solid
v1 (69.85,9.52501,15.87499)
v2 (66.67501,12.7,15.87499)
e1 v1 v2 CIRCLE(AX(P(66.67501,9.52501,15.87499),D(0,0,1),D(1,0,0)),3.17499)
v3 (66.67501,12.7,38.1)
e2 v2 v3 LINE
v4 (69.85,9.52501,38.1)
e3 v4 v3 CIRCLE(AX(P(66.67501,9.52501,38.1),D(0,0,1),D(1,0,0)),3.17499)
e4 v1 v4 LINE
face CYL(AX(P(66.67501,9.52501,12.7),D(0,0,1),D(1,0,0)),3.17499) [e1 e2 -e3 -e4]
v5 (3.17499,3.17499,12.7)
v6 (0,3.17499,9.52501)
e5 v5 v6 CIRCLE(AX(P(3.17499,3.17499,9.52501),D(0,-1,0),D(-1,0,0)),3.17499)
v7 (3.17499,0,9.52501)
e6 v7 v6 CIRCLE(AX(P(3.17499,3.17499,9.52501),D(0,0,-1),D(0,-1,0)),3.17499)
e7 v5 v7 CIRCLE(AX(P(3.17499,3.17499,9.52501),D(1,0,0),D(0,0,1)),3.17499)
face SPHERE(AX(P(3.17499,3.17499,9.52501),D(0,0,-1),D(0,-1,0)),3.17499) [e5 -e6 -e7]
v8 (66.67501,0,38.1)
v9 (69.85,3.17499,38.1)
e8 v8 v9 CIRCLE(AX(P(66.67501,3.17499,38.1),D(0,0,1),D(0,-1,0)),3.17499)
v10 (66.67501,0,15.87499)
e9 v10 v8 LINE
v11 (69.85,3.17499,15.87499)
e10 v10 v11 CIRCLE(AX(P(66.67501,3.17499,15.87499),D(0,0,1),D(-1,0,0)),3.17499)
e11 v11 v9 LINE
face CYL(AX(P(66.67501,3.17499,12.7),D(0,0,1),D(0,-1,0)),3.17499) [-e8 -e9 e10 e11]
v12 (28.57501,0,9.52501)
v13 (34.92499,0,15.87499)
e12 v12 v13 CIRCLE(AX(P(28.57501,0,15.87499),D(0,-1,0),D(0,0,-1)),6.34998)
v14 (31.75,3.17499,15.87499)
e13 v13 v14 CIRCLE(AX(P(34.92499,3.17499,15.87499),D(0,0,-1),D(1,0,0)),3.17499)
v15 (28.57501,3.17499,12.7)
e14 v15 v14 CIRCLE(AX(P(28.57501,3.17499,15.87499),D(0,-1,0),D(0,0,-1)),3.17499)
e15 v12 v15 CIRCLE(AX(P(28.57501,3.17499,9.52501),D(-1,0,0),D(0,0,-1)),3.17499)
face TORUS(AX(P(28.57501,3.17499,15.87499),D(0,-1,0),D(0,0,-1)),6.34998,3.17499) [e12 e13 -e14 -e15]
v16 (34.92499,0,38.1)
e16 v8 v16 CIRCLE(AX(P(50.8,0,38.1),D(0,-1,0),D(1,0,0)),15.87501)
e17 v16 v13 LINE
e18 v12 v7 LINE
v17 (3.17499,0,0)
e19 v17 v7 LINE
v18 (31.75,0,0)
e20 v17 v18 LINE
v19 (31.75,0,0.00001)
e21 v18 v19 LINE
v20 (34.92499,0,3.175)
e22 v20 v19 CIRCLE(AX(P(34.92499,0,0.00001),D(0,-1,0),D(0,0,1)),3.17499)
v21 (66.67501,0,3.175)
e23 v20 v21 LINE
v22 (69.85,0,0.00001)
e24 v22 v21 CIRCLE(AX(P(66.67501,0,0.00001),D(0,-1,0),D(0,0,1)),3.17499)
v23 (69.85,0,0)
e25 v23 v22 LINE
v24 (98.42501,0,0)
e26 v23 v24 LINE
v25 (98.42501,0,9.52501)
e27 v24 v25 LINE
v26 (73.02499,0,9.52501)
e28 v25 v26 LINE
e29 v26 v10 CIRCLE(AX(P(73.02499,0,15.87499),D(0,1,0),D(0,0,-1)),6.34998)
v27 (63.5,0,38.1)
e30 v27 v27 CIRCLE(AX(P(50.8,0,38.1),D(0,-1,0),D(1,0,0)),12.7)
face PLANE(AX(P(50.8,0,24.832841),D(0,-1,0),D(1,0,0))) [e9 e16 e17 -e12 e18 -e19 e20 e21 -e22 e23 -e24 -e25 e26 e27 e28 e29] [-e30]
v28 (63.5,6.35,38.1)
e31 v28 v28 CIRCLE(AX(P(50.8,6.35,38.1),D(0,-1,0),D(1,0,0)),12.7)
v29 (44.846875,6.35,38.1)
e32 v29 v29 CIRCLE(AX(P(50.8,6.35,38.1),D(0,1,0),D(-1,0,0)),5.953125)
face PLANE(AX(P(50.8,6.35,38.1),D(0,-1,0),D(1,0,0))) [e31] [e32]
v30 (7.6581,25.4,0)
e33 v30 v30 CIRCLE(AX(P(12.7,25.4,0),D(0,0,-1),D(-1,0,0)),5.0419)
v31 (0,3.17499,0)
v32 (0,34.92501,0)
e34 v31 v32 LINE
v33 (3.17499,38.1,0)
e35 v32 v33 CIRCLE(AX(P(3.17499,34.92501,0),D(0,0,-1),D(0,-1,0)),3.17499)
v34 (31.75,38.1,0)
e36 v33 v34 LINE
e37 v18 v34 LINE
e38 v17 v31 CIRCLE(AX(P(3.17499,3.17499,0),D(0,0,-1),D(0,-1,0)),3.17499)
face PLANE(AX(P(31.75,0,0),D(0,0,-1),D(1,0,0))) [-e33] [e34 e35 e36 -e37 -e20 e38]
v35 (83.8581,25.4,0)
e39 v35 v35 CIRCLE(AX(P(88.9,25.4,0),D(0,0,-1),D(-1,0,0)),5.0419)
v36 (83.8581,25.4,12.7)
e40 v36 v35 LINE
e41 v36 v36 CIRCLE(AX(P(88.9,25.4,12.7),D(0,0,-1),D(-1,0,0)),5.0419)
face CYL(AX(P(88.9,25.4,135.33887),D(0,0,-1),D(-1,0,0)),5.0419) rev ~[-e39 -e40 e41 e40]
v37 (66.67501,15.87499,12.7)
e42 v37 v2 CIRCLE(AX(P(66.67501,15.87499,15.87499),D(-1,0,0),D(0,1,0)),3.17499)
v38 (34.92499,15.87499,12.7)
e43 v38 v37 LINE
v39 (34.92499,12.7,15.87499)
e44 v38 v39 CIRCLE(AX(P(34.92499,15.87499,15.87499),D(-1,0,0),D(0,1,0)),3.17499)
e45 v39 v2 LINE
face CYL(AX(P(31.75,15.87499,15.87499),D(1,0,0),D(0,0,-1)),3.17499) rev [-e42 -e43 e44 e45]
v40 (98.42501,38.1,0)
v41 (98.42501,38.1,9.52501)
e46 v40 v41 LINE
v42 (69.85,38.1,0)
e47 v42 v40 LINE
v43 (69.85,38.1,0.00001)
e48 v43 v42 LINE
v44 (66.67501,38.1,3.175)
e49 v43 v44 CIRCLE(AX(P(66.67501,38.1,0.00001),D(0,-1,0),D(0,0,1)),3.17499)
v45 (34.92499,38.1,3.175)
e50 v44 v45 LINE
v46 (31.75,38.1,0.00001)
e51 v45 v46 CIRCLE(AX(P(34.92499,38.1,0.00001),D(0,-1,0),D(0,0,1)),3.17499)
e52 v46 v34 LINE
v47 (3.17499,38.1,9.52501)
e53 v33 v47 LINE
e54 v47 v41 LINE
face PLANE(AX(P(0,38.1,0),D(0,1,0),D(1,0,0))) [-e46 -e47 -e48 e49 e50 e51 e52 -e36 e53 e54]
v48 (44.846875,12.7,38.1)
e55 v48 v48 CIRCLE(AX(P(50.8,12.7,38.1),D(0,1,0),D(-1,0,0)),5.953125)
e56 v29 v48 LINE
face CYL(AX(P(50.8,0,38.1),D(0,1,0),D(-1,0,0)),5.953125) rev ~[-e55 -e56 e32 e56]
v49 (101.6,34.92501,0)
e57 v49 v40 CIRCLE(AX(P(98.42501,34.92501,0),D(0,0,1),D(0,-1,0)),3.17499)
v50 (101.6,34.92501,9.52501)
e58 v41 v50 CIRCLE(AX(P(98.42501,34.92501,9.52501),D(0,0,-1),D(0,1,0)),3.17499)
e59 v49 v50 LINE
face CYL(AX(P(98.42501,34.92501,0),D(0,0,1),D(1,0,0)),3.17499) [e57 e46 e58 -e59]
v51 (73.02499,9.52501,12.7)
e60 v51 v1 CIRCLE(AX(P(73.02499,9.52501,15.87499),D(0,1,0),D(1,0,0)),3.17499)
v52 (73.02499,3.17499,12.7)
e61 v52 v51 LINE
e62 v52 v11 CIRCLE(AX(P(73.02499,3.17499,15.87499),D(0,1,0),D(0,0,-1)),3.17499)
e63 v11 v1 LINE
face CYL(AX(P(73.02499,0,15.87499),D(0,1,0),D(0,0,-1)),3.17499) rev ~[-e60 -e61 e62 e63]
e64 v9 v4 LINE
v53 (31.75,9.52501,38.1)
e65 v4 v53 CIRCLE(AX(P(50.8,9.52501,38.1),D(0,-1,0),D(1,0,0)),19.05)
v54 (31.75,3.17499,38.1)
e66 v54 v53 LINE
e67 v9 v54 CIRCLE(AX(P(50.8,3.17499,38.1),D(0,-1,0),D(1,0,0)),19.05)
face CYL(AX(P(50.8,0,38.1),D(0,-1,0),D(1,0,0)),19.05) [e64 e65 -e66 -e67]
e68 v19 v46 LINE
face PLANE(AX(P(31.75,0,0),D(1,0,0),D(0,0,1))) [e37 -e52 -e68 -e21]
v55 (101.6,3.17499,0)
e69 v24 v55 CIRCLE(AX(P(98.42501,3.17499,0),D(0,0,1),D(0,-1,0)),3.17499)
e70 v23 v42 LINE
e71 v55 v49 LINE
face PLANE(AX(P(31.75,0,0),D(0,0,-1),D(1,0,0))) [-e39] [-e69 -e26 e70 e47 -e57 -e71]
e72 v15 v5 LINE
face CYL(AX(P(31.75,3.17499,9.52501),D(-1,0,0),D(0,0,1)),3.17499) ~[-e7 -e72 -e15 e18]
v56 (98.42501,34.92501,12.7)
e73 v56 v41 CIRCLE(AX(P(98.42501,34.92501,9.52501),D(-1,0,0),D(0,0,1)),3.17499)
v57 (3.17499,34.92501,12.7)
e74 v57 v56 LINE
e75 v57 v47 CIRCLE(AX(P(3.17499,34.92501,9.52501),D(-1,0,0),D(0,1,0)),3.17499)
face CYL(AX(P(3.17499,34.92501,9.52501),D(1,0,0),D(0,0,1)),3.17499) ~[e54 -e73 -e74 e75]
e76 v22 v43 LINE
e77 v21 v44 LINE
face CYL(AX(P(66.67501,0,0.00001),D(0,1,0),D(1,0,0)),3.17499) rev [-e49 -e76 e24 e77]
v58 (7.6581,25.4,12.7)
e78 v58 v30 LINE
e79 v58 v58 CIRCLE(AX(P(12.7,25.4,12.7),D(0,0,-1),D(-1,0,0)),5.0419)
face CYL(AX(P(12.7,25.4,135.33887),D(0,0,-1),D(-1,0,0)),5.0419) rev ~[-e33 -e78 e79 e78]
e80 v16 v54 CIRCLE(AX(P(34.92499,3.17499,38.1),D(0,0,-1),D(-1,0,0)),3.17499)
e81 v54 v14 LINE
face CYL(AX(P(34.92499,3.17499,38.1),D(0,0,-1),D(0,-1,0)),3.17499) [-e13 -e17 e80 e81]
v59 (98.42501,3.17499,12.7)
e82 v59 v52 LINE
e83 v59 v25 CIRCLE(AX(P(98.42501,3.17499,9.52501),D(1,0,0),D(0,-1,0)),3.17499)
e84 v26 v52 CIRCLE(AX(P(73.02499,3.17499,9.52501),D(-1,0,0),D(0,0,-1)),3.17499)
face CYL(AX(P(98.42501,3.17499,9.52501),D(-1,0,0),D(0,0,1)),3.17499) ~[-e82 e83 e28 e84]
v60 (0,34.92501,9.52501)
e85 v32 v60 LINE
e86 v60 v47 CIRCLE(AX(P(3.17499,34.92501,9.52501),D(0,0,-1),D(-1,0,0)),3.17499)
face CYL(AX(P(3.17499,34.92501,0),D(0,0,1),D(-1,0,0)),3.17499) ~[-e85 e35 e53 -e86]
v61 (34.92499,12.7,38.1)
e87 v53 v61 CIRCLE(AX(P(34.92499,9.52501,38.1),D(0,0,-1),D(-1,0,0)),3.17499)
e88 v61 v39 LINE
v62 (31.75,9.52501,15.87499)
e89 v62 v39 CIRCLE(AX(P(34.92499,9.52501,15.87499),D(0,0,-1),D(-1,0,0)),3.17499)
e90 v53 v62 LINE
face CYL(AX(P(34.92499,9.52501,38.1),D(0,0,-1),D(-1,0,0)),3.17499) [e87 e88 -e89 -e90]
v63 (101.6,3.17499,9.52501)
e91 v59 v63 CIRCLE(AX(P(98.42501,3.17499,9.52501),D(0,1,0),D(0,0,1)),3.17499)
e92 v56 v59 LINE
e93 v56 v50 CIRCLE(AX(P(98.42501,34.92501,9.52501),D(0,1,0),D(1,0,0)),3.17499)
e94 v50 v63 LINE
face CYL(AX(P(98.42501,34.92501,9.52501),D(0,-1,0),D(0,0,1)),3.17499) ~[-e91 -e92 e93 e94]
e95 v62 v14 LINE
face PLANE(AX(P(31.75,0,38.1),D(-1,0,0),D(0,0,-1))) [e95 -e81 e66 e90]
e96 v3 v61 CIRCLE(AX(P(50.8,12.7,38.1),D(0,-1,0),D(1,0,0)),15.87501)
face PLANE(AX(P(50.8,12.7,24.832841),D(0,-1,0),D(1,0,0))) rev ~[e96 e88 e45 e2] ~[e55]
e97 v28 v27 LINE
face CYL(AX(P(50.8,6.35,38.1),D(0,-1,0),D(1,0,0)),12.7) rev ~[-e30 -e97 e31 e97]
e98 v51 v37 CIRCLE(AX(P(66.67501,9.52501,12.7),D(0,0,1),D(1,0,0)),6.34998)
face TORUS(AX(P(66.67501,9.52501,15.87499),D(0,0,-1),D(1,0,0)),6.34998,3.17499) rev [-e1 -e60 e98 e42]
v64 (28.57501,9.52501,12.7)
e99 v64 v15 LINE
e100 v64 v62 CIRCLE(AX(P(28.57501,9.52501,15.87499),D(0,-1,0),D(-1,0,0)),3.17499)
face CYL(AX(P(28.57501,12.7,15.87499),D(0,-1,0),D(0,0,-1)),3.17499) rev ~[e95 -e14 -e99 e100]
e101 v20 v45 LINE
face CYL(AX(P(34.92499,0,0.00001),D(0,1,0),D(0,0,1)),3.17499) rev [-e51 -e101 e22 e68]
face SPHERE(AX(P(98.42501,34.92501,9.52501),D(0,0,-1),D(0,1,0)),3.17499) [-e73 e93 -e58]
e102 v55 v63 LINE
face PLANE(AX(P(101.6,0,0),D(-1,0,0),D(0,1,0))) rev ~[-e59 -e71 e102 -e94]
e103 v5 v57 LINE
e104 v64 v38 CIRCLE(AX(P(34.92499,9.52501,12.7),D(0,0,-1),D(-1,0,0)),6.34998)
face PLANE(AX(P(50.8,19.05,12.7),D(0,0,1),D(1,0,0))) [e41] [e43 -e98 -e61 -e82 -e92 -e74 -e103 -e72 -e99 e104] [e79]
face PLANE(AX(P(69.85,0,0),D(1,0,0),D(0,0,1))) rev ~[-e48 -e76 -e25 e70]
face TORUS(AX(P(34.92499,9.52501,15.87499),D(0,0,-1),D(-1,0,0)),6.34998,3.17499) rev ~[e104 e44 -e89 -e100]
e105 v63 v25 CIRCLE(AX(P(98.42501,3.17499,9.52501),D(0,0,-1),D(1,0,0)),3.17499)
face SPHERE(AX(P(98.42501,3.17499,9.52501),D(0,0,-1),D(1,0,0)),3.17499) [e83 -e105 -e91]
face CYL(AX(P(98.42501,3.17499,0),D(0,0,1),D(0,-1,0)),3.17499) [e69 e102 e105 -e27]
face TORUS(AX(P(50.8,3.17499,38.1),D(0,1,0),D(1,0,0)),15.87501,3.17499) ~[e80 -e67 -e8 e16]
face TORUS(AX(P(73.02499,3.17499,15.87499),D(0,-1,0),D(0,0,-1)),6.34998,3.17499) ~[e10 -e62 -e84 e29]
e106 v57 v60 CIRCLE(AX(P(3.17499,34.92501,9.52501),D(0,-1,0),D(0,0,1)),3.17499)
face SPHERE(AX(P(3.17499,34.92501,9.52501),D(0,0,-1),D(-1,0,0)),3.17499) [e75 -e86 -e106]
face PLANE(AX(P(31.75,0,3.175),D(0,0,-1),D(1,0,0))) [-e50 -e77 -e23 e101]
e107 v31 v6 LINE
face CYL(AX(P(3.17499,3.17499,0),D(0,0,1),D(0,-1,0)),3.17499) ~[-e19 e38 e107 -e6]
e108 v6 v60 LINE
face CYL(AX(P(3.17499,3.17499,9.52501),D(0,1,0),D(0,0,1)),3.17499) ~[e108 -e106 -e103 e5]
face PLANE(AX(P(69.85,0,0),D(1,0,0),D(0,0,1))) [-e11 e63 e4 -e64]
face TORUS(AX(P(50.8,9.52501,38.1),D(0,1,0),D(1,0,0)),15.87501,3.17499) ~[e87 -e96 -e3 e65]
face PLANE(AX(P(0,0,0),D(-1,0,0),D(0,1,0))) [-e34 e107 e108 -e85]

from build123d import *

# Parameters (mm, degrees)
F0_W           = 101.6
F0_H           = 38.1
F1_DEPTH       = 12.7
F3_DEPTH       = 12.7
F5_D           = 11.90625
F5_CBORE_D     = 25.4
F5_CBORE_DEPTH = 6.35
F6_W           = 38.1
F6_H           = 3.175
F7_DEPTH       = 38.101
F9_D           = 10.0838
F10_R          = 3.17499
F11_R          = 3.17499


# Not quite as in the source:
# - a fillet or chamfer is up to 0.001 mm smaller than in the source, because OpenCascade refuses the exact size
# - a length typed as a fraction of an inch, garbled in the dataset ("3 / 203.2 mm" for 3/8 in), is restored


with BuildPart() as f1:
    # F0 (on Top) → F1 (new body)
    with BuildSketch(Plane.XY):
        with Locations((50.8, 19.05)):
            Rectangle(F0_W, F0_H)
    extrude(amount=F1_DEPTH)

    # F2 (on Front) → F3 (join)
    with BuildSketch(Plane.XZ):
        with BuildLine():
            Line((31.75, 38.1), (31.75, 0))
            Line((31.75, 0), (69.85, 0))
            Line((69.85, 0), (69.85, 38.1))
            ThreePointArc((69.85, 38.1), (50.8, 57.15), (31.75, 38.1))
        make_face()
    extrude(amount=-F3_DEPTH)

    # F5 (through all)
    with Locations(Plane.XZ):
        with Locations((50.8, 38.1)):
            CounterBoreHole(F5_D / 2, F5_CBORE_D / 2, F5_CBORE_DEPTH)

    # F6 (on face) → F7 (cut, through all)
    with BuildSketch(Plane.XZ):
        with Locations((50.8, 1.5875)):
            Rectangle(F6_W, F6_H)
    extrude(amount=-F7_DEPTH, mode=Mode.SUBTRACT)

    # F9 (through all)
    with Locations(Plane.XY.offset(12.7)):
        with Locations((12.7, 25.4), (88.9, 25.4)):
            Hole(F9_D / 2)

    # F10 (radius 3.175 in the source; OpenCascade refuses exactly that, so slightly less here)
    f10_edges = [f1.edges().sort_by_distance(p)[0] for p in [
        (0, 0, 6.35),
        (0, 38.1, 6.35),
        (101.6, 0, 6.35),
        (101.6, 38.1, 6.35),
        (31.75, 19.05, 3.175),
        (69.85, 19.05, 3.175),
    ]]
    fillet(f10_edges, radius=F10_R)

    # F11 (radius 3.175 in the source; OpenCascade refuses exactly that, so slightly less here)
    f11_edges = [f1.edges().sort_by_distance(p)[0] for p in [
        (50.8, 38.1, 12.7),
        (101.6, 19.05, 12.7),
        (100.670067, 37.170067, 12.7),
        (100.670067, 0.929933, 12.7),
        (84.137505, 0, 12.7),
        (0.929933, 37.170067, 12.7),
        (0, 19.05, 12.7),
        (0.929933, 0.929933, 12.7),
        (17.462495, 0, 12.7),
        (31.75, 0, 25.4),
        (50.8, 0, 57.15),
        (69.85, 0, 25.4),
        (69.85, 6.35, 12.7),
        (31.75, 6.35, 12.7),
        (50.8, 12.7, 12.7),
        (31.75, 12.7, 25.4),
        (50.8, 12.7, 57.15),
        (69.85, 12.7, 25.4),
    ]]
    fillet(f11_edges, radius=F11_R)


solid = f1.part
